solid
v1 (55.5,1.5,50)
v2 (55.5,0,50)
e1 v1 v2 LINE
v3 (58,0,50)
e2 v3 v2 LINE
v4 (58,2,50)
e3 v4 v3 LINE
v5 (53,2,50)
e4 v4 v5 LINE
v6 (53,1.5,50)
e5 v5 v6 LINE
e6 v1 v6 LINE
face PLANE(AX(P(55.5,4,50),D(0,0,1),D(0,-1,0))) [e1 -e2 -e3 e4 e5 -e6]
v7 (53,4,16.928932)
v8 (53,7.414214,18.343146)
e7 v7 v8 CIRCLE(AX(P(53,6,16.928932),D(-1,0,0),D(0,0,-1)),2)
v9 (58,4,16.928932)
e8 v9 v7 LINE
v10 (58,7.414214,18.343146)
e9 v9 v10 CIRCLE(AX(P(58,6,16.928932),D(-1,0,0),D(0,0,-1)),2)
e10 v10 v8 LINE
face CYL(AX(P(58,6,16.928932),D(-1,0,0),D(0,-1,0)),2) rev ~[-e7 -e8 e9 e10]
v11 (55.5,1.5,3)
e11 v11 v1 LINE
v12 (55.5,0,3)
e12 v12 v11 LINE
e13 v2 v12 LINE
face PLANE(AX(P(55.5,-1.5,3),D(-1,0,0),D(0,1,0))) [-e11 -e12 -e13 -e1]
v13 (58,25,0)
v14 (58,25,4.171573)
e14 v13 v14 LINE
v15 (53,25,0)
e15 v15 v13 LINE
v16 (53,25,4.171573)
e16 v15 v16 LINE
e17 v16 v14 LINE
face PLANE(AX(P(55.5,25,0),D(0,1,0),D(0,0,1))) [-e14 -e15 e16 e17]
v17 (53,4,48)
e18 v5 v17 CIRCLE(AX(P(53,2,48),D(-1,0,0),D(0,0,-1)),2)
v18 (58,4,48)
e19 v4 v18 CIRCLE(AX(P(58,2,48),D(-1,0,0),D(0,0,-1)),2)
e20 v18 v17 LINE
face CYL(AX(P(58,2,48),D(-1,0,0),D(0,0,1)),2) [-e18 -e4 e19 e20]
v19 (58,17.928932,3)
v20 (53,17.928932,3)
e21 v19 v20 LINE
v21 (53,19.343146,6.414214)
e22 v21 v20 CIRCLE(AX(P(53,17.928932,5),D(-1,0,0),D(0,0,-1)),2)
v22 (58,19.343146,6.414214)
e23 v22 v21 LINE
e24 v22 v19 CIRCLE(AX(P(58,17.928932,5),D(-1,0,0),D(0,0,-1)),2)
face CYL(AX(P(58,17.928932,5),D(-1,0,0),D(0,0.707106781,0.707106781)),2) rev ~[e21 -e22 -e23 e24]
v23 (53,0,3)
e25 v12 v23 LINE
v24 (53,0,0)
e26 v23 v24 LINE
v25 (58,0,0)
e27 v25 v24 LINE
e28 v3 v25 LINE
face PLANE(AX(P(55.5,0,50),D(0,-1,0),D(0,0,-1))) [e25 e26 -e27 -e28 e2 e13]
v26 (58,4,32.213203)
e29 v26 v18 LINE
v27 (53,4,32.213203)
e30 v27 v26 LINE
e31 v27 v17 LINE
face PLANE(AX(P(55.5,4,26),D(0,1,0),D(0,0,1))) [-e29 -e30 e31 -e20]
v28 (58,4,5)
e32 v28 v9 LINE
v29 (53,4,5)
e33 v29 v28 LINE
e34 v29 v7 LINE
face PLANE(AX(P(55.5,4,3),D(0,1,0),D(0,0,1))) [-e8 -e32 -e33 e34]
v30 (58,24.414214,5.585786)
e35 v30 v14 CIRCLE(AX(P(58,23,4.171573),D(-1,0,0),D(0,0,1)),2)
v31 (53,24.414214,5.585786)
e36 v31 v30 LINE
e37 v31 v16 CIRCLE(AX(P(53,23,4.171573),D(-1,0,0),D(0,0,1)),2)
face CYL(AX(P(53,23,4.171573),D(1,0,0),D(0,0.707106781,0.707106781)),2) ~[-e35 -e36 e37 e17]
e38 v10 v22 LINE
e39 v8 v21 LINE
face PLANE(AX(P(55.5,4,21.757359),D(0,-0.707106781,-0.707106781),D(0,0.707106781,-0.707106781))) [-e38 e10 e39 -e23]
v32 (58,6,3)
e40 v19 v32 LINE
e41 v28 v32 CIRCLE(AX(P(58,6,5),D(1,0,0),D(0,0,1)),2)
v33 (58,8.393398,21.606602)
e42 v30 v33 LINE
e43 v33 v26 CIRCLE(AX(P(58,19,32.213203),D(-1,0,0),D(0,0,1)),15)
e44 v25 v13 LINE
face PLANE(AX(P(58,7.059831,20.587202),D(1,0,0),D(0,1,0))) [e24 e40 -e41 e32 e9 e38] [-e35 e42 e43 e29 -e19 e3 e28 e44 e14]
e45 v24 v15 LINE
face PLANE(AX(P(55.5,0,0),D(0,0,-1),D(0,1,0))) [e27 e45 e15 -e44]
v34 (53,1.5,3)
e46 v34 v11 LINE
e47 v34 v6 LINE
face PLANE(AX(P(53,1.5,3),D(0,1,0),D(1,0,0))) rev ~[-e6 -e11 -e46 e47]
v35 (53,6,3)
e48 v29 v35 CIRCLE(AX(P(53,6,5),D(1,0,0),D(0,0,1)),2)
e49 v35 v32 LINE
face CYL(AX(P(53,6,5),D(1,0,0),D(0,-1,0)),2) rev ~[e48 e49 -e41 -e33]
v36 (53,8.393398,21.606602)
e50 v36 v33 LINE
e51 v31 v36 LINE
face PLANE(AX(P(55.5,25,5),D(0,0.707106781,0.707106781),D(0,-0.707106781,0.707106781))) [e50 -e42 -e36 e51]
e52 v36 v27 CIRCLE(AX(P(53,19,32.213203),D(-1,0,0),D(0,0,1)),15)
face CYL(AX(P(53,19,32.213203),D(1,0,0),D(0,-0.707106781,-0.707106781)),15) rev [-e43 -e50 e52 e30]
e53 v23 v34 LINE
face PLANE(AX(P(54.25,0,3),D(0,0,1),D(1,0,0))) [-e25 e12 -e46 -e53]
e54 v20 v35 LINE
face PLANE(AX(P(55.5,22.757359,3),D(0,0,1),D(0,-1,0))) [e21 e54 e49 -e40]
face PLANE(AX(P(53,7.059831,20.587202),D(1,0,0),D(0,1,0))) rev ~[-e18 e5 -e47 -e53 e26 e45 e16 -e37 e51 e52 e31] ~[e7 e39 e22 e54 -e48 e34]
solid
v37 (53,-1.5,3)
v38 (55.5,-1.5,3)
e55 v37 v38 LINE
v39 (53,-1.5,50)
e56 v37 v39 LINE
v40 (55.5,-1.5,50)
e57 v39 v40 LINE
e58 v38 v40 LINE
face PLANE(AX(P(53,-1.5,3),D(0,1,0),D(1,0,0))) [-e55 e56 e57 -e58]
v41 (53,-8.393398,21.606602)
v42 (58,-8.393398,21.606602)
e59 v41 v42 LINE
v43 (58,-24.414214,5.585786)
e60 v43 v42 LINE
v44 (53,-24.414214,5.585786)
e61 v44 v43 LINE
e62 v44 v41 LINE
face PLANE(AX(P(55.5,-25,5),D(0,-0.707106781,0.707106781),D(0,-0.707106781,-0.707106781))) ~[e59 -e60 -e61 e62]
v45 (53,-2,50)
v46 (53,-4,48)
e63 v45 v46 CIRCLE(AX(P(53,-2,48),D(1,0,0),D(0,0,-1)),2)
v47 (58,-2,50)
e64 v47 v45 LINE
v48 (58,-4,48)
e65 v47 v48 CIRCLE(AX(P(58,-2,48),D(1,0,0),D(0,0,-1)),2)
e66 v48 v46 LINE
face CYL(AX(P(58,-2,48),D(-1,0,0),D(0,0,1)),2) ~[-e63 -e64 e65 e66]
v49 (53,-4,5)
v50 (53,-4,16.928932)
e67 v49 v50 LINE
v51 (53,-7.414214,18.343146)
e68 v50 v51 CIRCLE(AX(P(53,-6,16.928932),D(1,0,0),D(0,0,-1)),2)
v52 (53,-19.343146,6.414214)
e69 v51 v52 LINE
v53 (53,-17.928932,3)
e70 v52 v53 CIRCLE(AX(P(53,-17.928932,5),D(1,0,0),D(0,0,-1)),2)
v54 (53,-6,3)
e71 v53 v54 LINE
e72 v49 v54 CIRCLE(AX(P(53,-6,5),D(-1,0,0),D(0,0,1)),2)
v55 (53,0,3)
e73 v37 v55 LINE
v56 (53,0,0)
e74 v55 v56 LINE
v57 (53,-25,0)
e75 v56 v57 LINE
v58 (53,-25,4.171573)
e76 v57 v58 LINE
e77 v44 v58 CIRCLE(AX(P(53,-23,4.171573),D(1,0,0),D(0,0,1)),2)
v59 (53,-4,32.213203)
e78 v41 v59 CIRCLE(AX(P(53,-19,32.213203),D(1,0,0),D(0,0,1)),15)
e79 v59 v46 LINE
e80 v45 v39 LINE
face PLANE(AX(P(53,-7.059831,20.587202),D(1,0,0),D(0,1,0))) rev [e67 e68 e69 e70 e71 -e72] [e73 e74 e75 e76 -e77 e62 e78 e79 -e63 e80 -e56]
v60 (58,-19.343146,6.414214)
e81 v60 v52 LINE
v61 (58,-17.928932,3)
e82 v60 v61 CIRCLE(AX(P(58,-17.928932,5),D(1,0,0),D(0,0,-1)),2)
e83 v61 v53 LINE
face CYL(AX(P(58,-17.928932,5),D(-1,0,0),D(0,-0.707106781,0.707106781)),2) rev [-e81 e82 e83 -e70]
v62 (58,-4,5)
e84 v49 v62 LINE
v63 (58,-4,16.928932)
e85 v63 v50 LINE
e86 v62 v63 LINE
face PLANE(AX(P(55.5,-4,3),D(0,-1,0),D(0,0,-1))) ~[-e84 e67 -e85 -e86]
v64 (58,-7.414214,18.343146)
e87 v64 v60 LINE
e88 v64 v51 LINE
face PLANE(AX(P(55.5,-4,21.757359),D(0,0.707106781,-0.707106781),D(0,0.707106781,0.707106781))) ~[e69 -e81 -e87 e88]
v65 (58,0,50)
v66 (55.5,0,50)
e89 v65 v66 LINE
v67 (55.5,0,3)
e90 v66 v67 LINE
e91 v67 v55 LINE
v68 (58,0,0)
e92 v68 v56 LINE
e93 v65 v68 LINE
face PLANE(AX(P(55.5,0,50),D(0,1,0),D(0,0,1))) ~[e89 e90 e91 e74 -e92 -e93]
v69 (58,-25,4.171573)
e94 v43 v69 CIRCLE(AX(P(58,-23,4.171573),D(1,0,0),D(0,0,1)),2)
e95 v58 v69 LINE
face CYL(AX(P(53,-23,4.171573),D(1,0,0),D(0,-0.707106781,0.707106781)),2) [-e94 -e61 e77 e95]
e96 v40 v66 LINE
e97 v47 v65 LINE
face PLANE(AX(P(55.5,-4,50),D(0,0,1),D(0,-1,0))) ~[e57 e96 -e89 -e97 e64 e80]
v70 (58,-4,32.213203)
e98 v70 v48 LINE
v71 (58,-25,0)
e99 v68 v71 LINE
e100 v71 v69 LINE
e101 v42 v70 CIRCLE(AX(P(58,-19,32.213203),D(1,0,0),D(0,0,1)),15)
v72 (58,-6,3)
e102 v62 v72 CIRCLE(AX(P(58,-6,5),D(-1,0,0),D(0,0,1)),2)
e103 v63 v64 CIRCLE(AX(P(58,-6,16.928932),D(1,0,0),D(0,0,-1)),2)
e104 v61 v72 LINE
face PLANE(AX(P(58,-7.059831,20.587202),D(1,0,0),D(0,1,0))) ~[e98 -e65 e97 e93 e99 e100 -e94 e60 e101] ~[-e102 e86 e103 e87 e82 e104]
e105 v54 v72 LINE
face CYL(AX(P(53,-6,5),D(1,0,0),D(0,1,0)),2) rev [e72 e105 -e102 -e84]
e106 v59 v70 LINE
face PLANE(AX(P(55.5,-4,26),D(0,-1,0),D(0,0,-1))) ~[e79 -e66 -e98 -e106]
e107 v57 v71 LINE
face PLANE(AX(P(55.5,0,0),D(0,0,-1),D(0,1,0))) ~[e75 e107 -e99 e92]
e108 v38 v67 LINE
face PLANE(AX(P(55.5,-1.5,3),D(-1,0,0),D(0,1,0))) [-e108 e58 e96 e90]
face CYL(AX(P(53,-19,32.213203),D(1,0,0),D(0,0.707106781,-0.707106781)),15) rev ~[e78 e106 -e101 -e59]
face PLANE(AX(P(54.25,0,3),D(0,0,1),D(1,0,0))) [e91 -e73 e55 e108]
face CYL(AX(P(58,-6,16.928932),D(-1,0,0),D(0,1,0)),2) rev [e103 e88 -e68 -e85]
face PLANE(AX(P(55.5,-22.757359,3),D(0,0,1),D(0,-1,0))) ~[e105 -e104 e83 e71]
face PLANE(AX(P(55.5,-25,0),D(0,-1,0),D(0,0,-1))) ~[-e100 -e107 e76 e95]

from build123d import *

# Parameters (mm, degrees)
F2_DEPTH = 2.5
F3_R     = 2
F3_2_R   = 2
F4_R     = 15
F4_2_R   = 15
F6_W     = 2.5
F6_H     = 3
F7_DEPTH = 47.001


# Not quite as in the source:
# - a pattern or mirror of a feature is missing from the dataset's text; its kind, count and spacing are read off the source's solid


with BuildPart() as f2:
    # F1 (on offset) → F2 (new body, symmetric)
    with BuildSketch(Plane.YZ.offset(55.5)):
        Polygon((0, 0), (25, 0), (25, 5), (4, 26), (4, 50), (0, 50), align=None)
        Polygon((4, 3), (4, 21.7573593129), (22.7573593129, 3), align=None, mode=Mode.SUBTRACT)
    extrude(amount=F2_DEPTH, both=True)


with BuildPart() as f2_copies_1:
    # F2_copies: instance of F2
    add(f2.part.mirror(Plane(origin=(0, 0, 0), x_dir=(0, 0, -1), z_dir=(0, -1, 0))))

    # F3#2
    f3_2_edges = [f2_copies_1.edges().sort_by_distance(p)[0] for p in [
        (55.5, -4, 50),
        (55.5, -25, 5),
        (55.5, -4, 21.757359),
        (55.5, -22.757359, 3),
        (55.5, -4, 3),
    ]]
    fillet(f3_2_edges, radius=F3_2_R)

    # F4#2
    f4_2_edges = [f2_copies_1.edges().sort_by_distance(p)[0] for p in [
        (55.5, -4, 26),
    ]]
    fillet(f4_2_edges, radius=F4_2_R)


with BuildPart() as f2_1:
    add(f2.part)

    # F3
    f3_edges = [f2_1.edges().sort_by_distance(p)[0] for p in [
        (55.5, 4, 50),
        (55.5, 25, 5),
        (55.5, 22.757359, 3),
        (55.5, 4, 3),
        (55.5, 4, 21.757359),
    ]]
    fillet(f3_edges, radius=F3_R)

    # F4
    f4_edges = [f2_1.edges().sort_by_distance(p)[0] for p in [
        (55.5, 4, 26),
    ]]
    fillet(f4_edges, radius=F4_R)


with BuildPart() as f7_tool:
    # F6 (on offset) → F7 (new body, through all)
    with BuildSketch(Plane.XY.offset(3)):
        with Locations((54.25, 0)):
            Rectangle(F6_W, F6_H)
    extrude(amount=F7_DEPTH)


with BuildPart() as f2_2:
    add(f2_1.part)

    # F7: cut by f7_tool
    add(f7_tool.part, mode=Mode.SUBTRACT)


with BuildPart() as f2_copies_1_1:
    add(f2_copies_1.part)

    # F7: cut by f7_tool
    add(f7_tool.part, mode=Mode.SUBTRACT)


solid = Compound([f2_2.part, f2_copies_1_1.part])
